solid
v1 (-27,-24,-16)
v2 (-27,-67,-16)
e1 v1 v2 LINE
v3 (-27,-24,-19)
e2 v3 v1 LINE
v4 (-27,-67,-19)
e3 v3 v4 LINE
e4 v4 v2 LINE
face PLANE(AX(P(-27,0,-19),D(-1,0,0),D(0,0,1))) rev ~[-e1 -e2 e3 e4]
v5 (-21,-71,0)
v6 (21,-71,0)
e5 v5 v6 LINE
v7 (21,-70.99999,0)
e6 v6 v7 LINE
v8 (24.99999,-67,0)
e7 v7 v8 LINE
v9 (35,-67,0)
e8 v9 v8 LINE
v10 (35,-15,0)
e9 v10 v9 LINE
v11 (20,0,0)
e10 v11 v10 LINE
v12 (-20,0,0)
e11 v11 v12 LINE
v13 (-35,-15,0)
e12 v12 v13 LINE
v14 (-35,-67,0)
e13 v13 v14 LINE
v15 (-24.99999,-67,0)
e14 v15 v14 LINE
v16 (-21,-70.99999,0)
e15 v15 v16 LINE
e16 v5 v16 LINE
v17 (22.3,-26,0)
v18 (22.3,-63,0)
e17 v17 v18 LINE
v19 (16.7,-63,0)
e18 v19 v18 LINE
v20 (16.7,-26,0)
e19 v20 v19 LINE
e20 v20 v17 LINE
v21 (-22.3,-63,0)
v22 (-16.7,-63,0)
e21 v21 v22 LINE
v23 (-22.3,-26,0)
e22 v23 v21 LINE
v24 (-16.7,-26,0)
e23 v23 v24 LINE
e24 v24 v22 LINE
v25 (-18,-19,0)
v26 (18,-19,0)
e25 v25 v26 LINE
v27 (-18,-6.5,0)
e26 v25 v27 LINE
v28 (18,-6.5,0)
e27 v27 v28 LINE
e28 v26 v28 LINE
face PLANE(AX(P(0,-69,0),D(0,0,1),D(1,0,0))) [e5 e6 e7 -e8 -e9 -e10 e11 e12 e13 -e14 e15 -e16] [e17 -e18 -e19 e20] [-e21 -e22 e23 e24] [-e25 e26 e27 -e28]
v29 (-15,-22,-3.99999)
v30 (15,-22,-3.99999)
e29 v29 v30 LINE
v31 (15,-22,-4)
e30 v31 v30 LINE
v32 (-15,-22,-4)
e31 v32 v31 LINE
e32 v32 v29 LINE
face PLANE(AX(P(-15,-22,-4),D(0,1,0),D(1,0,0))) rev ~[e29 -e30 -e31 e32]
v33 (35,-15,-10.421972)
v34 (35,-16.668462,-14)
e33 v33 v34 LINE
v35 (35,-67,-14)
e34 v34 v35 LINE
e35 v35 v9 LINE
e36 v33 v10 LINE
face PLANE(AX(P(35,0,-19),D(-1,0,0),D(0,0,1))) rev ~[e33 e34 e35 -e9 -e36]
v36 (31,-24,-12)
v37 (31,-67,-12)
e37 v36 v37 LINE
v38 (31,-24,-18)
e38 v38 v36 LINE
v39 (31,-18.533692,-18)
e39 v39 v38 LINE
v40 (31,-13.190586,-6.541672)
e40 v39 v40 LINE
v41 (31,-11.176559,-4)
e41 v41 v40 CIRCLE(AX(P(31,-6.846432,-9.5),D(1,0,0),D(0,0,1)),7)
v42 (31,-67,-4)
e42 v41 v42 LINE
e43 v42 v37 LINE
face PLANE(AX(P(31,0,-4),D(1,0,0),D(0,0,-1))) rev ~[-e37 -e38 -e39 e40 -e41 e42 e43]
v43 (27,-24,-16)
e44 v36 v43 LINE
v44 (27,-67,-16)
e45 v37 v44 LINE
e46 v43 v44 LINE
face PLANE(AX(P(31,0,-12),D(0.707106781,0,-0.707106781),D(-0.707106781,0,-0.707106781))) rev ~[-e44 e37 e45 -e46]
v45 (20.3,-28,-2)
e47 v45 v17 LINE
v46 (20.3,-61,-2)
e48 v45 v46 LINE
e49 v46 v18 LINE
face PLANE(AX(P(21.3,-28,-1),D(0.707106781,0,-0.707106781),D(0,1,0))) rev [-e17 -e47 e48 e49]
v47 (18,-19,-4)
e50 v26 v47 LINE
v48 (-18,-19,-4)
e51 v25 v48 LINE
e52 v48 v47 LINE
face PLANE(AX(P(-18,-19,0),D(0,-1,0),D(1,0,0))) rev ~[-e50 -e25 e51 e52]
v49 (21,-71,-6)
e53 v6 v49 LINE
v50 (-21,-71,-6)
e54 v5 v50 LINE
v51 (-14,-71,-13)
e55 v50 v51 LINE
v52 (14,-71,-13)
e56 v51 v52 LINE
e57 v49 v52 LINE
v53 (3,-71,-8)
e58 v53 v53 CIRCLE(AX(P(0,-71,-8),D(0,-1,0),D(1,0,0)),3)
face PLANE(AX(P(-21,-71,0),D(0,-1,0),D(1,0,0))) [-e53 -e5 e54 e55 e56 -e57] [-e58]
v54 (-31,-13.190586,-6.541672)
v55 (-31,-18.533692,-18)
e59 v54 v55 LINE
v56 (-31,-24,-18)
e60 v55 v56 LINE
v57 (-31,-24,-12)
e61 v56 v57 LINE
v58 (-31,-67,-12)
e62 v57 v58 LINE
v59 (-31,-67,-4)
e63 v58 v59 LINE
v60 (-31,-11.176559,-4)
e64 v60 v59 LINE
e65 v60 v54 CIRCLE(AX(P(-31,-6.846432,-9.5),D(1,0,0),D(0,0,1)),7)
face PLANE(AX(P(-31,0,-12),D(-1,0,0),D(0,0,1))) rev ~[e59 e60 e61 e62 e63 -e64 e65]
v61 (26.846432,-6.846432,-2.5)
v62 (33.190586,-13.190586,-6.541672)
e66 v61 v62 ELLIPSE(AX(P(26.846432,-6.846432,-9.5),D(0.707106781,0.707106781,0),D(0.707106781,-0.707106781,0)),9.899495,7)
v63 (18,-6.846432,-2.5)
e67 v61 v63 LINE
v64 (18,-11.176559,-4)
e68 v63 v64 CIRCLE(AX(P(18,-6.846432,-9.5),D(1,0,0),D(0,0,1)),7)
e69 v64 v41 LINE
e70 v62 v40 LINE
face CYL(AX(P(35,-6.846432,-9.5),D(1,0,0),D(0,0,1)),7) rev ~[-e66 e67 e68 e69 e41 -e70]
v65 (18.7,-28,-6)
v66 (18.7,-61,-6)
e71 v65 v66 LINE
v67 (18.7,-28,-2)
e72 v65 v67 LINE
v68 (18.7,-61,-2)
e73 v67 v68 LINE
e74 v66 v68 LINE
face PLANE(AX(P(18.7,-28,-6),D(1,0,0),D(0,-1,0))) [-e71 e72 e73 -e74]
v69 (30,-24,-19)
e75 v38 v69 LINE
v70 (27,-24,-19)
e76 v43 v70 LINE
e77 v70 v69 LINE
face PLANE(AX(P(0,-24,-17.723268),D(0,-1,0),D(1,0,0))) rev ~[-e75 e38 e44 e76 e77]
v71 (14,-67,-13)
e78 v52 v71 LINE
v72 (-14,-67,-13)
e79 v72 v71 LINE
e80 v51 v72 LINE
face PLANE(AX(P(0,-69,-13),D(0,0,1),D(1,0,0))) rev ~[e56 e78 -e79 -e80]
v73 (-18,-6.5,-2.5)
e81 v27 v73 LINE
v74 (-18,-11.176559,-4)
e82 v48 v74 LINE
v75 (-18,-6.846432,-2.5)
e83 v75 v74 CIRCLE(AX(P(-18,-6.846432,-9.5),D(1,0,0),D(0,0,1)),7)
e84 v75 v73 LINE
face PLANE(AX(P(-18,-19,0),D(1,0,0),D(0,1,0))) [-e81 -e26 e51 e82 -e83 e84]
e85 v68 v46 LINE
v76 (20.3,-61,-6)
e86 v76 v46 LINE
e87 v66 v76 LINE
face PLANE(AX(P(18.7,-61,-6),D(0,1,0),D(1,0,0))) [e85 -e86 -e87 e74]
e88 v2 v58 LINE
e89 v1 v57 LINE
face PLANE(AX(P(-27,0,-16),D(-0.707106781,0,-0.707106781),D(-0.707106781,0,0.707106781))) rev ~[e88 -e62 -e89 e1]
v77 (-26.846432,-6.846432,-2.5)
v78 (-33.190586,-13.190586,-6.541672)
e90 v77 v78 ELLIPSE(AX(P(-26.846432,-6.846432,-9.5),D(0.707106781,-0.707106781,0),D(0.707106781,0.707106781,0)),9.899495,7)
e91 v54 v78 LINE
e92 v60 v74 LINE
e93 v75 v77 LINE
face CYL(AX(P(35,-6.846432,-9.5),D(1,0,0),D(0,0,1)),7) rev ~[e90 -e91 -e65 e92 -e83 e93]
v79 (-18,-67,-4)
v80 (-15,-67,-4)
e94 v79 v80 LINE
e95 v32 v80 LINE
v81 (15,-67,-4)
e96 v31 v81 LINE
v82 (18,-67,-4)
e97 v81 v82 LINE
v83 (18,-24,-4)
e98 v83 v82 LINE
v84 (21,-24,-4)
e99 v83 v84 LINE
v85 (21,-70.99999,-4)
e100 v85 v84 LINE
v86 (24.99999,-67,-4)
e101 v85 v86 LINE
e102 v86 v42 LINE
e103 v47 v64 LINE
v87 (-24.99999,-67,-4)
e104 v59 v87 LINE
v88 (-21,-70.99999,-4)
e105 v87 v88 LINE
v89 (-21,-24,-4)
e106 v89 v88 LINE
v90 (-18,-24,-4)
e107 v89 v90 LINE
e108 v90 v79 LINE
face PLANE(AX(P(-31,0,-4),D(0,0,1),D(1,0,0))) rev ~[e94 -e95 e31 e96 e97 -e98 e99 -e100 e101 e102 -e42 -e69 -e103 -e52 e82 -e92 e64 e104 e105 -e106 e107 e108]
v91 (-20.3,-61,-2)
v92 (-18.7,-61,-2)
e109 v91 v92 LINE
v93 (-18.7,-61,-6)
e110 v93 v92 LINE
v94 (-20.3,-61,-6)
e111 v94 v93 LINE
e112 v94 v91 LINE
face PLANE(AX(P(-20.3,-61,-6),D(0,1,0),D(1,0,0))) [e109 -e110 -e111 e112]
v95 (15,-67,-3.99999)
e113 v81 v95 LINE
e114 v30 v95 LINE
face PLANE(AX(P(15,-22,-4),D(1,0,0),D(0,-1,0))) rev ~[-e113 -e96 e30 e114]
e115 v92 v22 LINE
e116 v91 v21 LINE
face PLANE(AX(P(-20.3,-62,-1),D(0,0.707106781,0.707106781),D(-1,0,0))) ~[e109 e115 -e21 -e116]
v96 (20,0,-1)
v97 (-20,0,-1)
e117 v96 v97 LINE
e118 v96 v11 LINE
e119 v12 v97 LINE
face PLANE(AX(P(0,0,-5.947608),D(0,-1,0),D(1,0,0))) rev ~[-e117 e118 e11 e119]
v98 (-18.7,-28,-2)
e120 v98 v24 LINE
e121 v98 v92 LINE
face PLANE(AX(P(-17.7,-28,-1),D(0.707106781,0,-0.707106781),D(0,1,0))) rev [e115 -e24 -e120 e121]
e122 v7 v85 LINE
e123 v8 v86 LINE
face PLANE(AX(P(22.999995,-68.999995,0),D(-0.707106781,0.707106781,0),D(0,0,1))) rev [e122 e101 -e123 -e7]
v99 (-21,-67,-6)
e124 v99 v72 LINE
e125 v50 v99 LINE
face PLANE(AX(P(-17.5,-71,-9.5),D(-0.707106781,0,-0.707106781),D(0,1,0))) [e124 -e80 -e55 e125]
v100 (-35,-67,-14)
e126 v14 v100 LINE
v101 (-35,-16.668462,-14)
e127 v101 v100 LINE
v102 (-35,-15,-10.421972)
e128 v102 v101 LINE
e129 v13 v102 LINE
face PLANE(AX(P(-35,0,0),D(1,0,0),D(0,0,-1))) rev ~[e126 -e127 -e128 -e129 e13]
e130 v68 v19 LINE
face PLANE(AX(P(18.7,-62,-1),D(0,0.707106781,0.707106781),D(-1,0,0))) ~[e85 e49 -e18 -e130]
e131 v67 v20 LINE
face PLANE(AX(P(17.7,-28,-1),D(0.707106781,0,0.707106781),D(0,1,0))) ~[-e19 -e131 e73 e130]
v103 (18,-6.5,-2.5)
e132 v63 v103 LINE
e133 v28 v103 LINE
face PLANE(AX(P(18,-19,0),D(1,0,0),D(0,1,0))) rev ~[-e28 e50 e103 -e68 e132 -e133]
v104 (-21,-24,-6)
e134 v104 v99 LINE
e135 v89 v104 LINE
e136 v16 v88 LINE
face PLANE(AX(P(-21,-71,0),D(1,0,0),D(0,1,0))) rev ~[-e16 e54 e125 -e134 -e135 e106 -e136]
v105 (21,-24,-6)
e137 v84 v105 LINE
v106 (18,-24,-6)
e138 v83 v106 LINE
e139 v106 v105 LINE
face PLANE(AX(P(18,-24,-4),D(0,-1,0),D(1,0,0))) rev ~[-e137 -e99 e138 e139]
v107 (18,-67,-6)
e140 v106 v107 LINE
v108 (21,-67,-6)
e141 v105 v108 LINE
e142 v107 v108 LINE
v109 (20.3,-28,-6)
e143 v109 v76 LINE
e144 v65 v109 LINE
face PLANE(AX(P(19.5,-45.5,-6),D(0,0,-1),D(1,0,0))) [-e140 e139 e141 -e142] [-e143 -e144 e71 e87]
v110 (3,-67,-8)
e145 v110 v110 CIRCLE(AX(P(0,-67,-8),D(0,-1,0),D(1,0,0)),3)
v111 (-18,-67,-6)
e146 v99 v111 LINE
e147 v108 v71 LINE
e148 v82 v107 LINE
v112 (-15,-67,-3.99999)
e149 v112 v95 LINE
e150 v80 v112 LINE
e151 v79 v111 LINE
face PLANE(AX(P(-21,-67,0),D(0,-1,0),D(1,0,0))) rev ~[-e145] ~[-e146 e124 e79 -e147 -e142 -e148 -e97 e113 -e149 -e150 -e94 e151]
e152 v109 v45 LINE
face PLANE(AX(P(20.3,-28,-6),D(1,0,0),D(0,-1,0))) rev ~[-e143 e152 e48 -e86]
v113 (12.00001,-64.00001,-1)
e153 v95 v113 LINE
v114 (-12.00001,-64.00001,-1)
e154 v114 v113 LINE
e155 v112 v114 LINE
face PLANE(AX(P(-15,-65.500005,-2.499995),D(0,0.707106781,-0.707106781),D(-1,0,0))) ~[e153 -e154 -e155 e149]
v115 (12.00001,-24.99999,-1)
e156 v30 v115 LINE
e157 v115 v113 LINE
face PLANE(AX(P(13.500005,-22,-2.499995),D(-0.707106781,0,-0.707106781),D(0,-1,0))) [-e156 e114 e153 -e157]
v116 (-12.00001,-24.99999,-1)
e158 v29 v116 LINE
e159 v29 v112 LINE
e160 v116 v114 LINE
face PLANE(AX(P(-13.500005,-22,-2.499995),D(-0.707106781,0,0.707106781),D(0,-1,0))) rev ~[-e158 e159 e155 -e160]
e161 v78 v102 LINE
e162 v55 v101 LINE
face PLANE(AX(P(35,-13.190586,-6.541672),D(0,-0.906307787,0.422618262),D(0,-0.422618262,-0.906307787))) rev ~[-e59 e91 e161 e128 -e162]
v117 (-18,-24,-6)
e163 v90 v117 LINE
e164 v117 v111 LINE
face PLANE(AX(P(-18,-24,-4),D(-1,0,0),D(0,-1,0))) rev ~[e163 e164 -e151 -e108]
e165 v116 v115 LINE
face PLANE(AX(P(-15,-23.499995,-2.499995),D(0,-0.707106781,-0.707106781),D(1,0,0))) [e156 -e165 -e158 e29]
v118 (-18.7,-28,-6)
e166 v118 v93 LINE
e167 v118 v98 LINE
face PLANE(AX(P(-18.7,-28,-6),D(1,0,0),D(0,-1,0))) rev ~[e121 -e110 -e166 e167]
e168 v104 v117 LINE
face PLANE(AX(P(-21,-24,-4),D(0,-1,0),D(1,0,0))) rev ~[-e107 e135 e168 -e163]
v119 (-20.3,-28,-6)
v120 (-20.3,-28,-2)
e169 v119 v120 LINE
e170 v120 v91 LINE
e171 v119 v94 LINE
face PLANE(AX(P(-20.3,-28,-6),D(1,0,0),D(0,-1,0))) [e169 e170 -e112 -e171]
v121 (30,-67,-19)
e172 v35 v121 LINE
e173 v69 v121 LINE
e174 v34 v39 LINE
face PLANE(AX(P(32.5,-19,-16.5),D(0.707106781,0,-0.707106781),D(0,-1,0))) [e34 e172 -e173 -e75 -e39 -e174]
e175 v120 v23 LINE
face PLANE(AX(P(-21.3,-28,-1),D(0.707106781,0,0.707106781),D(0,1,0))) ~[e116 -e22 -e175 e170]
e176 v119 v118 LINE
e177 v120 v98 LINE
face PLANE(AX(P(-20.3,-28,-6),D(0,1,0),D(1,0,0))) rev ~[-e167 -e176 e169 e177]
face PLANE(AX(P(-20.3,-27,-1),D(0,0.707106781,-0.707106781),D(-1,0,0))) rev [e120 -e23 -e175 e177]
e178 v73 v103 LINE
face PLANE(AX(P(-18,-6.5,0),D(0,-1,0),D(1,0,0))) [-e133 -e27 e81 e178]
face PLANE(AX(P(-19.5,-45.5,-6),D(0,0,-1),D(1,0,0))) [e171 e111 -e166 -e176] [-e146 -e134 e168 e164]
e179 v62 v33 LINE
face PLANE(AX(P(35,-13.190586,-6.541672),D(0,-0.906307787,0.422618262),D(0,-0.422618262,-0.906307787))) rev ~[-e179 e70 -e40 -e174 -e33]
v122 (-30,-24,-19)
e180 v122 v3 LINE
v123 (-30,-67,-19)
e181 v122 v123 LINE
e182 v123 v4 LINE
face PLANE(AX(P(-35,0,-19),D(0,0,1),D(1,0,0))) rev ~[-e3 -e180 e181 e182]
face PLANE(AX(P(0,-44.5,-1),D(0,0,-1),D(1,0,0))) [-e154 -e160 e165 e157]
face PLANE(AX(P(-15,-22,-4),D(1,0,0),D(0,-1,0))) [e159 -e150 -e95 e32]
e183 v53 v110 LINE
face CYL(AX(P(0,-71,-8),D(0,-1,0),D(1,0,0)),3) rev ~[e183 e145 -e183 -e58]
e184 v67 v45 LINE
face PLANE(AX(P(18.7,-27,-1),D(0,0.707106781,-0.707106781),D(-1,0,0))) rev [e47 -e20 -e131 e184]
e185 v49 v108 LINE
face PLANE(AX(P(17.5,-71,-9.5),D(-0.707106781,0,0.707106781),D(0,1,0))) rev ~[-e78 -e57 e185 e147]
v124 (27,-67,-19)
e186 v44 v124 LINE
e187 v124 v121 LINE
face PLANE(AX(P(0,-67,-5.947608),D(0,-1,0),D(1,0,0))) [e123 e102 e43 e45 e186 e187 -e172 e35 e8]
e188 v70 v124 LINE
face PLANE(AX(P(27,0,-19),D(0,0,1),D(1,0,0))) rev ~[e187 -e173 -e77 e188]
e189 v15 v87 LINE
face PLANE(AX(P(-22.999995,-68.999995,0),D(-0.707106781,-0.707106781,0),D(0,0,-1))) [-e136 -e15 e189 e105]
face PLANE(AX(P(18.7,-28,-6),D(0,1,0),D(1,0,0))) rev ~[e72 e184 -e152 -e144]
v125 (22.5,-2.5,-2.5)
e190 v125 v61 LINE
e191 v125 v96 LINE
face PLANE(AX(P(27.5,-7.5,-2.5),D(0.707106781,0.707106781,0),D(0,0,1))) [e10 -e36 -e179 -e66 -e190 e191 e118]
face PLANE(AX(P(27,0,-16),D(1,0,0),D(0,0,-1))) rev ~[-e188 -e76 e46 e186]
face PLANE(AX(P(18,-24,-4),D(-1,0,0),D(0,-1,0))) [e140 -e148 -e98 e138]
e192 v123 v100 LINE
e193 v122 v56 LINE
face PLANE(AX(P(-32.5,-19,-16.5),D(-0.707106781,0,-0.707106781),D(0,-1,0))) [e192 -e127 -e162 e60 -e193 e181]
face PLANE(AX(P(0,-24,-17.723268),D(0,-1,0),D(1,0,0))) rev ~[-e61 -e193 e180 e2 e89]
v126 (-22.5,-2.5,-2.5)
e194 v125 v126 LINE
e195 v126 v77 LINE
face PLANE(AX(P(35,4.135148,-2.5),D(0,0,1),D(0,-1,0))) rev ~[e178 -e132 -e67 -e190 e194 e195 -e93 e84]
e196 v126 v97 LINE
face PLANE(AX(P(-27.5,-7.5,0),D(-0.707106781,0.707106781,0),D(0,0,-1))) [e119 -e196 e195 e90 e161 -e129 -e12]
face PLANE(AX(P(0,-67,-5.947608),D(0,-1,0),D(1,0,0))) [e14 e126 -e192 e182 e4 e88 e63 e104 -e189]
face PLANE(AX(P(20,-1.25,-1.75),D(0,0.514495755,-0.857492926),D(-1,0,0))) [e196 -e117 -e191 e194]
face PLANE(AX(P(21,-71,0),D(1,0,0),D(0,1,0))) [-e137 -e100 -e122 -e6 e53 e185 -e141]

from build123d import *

# Parameters (mm, degrees)
F1_DEPTH  = 67
F3_DEPTH  = 70.001
F4_W      = 36
F4_H      = 12.5
F5_DEPTH  = 25
F6_W      = 3
F6_H      = 43
F7_DEPTH  = 2
F8_W      = 1.6
F8_H      = 33
F9_DEPTH  = 6.001
F10_W     = 42
F10_H     = 4
F11_DEPTH = 13
F13_SIZE  = 5
F14_SIZE  = 3.99999
F15_SIZE  = 15
F16_SIZE  = 7
F12_R     = 3
F17_DEPTH = 71.001
F18_W     = 30
F18_H     = 45
F19_DEPTH = 3
F20_SIZE  = 2.99999
F21_SIZE  = 2
F22_SIZE2 = 1.5
F22_SIZE  = 2.5
F24_START = -43
F23_W     = 62
F23_H     = 16.8932331726
F24_DEPTH = 57


# Not quite as in the source:
# - a fillet or chamfer is up to 0.001 mm smaller than in the source, because OpenCascade refuses the exact size


with BuildPart() as f1:
    # F0 (on Front) → F1 (new body)
    with BuildSketch(Plane.XZ):
        Polygon((35, 0), (-35, 0), (-35, -19), (-27, -19), (-27, -16), (-31, -12), (-31, -4), (31, -4), (31, -12), (27, -16), (27, -19), (35, -19), align=None)
    extrude(amount=F1_DEPTH)

    # F2 (on face) → F3 (cut, through all)
    with BuildSketch(Plane.YZ.offset(35)):
        with BuildLine():
            Line((-13.190586324, -6.5416721678), (-19, -19))
            Line((-19, -19), (4.1351475573, -19))
            Line((4.1351475573, -19), (4.1351475573, -2.5))
            Line((4.1351475573, -2.5), (-6.8464318148, -2.5))
            ThreePointArc((-6.8464318148, -2.5), (-10.6075290732, -3.5962598793), (-13.190586324, -6.5416721678))
        make_face()
    extrude(amount=-F3_DEPTH, mode=Mode.SUBTRACT)

    # F4 (on face) → F5 (cut)
    with BuildSketch(Plane.XY):
        with Locations((0, -12.75)):
            Rectangle(F4_W, F4_H)
    extrude(amount=-F5_DEPTH, mode=Mode.SUBTRACT)

    # F6 (on face) → F7 (join)
    with BuildSketch(Plane(origin=(0, 0, -4), x_dir=(1, 0, 0), z_dir=(0, 0, -1))):
        with Locations((-19.5, 45.5)):
            Rectangle(F6_W, F6_H)
        with Locations((19.5, 45.5)):
            Rectangle(F6_W, F6_H)
    extrude(amount=F7_DEPTH)

    # F8 (on face) → F9 (cut, through all)
    with BuildSketch(Plane(origin=(0, 0, -6), x_dir=(1, 0, 0), z_dir=(0, 0, -1))):
        with Locations((-19.5, 44.5)):
            Rectangle(F8_W, F8_H)
        with Locations((19.5, 44.5)):
            Rectangle(F8_W, F8_H)
    extrude(amount=-F9_DEPTH, mode=Mode.SUBTRACT)

    # F10 (on face) → F11 (join)
    with BuildSketch(Plane.XY):
        with Locations((0, -69)):
            Rectangle(F10_W, F10_H)
    extrude(amount=-F11_DEPTH)

    # F13
    f13_edges = [f1.edges().sort_by_distance(p)[0] for p in [
        (-35, -43, -19),
        (35, -43, -19),
    ]]
    chamfer(f13_edges, length=F13_SIZE)

    # F14 (size 4 in the source; OpenCascade refuses exactly that, so slightly less here)
    f14_edges = [f1.edges().sort_by_distance(p)[0] for p in [
        (-21, -67, -2),
        (21, -67, -2),
    ]]
    chamfer(f14_edges, length=F14_SIZE)

    # F15
    f15_edges = [f1.edges().sort_by_distance(p)[0] for p in [
        (35, 0, -1.25),
        (-35, 0, -1.25),
    ]]
    chamfer(f15_edges, length=F15_SIZE)

    # F16
    f16_edges = [f1.edges().sort_by_distance(p)[0] for p in [
        (-21, -69, -13),
        (21, -69, -13),
    ]]
    chamfer(f16_edges, length=F16_SIZE)

    # F12 (on face) → F17 (cut, through all)
    with BuildSketch(Plane.XZ.offset(71)):
        with Locations((0, -8)):
            Circle(F12_R)
    extrude(amount=-F17_DEPTH, mode=Mode.SUBTRACT)

    # F18 (on face) → F19 (cut)
    with BuildSketch(Plane(origin=(0, 0, -4), x_dir=(1, 0, 0), z_dir=(0, 0, -1))):
        with Locations((0, 44.5)):
            Rectangle(F18_W, F18_H)
    extrude(amount=-F19_DEPTH, mode=Mode.SUBTRACT)

    # F20 (size 3 in the source; OpenCascade refuses exactly that, so slightly less here)
    f20_edges = [f1.edges().sort_by_distance(p)[0] for p in [
        (0, -67, -1),
        (-15, -44.5, -1),
        (0, -22, -1),
        (15, -44.5, -1),
    ]]
    chamfer(f20_edges, length=F20_SIZE)

    # F21
    f21_edges = [f1.edges().sort_by_distance(p)[0] for p in [
        (20.3, -44.5, 0),
        (18.7, -44.5, 0),
        (19.5, -28, 0),
        (19.5, -61, 0),
        (-18.7, -44.5, 0),
        (-19.5, -28, 0),
        (-19.5, -61, 0),
        (-20.3, -44.5, 0),
    ]]
    chamfer(f21_edges, length=F21_SIZE)

    # F22
    f22_edges = [f1.edges().sort_by_distance(p)[0] for p in [
        (0, 0, -2.5),
    ]]
    f22_side = f1.faces().sort_by_distance((0, -3.465238, -2.5))[0]
    chamfer(f22_edges, length=F22_SIZE, length2=F22_SIZE2, reference=f22_side)

    # F23 (on face) → F24 (cut)
    with BuildSketch(Plane.XZ.offset(67).offset(F24_START)):
        with Locations((0, -17.7232683636)):
            Rectangle(F23_W, F23_H)
    extrude(amount=-F24_DEPTH, mode=Mode.SUBTRACT)


solid = f1.part
